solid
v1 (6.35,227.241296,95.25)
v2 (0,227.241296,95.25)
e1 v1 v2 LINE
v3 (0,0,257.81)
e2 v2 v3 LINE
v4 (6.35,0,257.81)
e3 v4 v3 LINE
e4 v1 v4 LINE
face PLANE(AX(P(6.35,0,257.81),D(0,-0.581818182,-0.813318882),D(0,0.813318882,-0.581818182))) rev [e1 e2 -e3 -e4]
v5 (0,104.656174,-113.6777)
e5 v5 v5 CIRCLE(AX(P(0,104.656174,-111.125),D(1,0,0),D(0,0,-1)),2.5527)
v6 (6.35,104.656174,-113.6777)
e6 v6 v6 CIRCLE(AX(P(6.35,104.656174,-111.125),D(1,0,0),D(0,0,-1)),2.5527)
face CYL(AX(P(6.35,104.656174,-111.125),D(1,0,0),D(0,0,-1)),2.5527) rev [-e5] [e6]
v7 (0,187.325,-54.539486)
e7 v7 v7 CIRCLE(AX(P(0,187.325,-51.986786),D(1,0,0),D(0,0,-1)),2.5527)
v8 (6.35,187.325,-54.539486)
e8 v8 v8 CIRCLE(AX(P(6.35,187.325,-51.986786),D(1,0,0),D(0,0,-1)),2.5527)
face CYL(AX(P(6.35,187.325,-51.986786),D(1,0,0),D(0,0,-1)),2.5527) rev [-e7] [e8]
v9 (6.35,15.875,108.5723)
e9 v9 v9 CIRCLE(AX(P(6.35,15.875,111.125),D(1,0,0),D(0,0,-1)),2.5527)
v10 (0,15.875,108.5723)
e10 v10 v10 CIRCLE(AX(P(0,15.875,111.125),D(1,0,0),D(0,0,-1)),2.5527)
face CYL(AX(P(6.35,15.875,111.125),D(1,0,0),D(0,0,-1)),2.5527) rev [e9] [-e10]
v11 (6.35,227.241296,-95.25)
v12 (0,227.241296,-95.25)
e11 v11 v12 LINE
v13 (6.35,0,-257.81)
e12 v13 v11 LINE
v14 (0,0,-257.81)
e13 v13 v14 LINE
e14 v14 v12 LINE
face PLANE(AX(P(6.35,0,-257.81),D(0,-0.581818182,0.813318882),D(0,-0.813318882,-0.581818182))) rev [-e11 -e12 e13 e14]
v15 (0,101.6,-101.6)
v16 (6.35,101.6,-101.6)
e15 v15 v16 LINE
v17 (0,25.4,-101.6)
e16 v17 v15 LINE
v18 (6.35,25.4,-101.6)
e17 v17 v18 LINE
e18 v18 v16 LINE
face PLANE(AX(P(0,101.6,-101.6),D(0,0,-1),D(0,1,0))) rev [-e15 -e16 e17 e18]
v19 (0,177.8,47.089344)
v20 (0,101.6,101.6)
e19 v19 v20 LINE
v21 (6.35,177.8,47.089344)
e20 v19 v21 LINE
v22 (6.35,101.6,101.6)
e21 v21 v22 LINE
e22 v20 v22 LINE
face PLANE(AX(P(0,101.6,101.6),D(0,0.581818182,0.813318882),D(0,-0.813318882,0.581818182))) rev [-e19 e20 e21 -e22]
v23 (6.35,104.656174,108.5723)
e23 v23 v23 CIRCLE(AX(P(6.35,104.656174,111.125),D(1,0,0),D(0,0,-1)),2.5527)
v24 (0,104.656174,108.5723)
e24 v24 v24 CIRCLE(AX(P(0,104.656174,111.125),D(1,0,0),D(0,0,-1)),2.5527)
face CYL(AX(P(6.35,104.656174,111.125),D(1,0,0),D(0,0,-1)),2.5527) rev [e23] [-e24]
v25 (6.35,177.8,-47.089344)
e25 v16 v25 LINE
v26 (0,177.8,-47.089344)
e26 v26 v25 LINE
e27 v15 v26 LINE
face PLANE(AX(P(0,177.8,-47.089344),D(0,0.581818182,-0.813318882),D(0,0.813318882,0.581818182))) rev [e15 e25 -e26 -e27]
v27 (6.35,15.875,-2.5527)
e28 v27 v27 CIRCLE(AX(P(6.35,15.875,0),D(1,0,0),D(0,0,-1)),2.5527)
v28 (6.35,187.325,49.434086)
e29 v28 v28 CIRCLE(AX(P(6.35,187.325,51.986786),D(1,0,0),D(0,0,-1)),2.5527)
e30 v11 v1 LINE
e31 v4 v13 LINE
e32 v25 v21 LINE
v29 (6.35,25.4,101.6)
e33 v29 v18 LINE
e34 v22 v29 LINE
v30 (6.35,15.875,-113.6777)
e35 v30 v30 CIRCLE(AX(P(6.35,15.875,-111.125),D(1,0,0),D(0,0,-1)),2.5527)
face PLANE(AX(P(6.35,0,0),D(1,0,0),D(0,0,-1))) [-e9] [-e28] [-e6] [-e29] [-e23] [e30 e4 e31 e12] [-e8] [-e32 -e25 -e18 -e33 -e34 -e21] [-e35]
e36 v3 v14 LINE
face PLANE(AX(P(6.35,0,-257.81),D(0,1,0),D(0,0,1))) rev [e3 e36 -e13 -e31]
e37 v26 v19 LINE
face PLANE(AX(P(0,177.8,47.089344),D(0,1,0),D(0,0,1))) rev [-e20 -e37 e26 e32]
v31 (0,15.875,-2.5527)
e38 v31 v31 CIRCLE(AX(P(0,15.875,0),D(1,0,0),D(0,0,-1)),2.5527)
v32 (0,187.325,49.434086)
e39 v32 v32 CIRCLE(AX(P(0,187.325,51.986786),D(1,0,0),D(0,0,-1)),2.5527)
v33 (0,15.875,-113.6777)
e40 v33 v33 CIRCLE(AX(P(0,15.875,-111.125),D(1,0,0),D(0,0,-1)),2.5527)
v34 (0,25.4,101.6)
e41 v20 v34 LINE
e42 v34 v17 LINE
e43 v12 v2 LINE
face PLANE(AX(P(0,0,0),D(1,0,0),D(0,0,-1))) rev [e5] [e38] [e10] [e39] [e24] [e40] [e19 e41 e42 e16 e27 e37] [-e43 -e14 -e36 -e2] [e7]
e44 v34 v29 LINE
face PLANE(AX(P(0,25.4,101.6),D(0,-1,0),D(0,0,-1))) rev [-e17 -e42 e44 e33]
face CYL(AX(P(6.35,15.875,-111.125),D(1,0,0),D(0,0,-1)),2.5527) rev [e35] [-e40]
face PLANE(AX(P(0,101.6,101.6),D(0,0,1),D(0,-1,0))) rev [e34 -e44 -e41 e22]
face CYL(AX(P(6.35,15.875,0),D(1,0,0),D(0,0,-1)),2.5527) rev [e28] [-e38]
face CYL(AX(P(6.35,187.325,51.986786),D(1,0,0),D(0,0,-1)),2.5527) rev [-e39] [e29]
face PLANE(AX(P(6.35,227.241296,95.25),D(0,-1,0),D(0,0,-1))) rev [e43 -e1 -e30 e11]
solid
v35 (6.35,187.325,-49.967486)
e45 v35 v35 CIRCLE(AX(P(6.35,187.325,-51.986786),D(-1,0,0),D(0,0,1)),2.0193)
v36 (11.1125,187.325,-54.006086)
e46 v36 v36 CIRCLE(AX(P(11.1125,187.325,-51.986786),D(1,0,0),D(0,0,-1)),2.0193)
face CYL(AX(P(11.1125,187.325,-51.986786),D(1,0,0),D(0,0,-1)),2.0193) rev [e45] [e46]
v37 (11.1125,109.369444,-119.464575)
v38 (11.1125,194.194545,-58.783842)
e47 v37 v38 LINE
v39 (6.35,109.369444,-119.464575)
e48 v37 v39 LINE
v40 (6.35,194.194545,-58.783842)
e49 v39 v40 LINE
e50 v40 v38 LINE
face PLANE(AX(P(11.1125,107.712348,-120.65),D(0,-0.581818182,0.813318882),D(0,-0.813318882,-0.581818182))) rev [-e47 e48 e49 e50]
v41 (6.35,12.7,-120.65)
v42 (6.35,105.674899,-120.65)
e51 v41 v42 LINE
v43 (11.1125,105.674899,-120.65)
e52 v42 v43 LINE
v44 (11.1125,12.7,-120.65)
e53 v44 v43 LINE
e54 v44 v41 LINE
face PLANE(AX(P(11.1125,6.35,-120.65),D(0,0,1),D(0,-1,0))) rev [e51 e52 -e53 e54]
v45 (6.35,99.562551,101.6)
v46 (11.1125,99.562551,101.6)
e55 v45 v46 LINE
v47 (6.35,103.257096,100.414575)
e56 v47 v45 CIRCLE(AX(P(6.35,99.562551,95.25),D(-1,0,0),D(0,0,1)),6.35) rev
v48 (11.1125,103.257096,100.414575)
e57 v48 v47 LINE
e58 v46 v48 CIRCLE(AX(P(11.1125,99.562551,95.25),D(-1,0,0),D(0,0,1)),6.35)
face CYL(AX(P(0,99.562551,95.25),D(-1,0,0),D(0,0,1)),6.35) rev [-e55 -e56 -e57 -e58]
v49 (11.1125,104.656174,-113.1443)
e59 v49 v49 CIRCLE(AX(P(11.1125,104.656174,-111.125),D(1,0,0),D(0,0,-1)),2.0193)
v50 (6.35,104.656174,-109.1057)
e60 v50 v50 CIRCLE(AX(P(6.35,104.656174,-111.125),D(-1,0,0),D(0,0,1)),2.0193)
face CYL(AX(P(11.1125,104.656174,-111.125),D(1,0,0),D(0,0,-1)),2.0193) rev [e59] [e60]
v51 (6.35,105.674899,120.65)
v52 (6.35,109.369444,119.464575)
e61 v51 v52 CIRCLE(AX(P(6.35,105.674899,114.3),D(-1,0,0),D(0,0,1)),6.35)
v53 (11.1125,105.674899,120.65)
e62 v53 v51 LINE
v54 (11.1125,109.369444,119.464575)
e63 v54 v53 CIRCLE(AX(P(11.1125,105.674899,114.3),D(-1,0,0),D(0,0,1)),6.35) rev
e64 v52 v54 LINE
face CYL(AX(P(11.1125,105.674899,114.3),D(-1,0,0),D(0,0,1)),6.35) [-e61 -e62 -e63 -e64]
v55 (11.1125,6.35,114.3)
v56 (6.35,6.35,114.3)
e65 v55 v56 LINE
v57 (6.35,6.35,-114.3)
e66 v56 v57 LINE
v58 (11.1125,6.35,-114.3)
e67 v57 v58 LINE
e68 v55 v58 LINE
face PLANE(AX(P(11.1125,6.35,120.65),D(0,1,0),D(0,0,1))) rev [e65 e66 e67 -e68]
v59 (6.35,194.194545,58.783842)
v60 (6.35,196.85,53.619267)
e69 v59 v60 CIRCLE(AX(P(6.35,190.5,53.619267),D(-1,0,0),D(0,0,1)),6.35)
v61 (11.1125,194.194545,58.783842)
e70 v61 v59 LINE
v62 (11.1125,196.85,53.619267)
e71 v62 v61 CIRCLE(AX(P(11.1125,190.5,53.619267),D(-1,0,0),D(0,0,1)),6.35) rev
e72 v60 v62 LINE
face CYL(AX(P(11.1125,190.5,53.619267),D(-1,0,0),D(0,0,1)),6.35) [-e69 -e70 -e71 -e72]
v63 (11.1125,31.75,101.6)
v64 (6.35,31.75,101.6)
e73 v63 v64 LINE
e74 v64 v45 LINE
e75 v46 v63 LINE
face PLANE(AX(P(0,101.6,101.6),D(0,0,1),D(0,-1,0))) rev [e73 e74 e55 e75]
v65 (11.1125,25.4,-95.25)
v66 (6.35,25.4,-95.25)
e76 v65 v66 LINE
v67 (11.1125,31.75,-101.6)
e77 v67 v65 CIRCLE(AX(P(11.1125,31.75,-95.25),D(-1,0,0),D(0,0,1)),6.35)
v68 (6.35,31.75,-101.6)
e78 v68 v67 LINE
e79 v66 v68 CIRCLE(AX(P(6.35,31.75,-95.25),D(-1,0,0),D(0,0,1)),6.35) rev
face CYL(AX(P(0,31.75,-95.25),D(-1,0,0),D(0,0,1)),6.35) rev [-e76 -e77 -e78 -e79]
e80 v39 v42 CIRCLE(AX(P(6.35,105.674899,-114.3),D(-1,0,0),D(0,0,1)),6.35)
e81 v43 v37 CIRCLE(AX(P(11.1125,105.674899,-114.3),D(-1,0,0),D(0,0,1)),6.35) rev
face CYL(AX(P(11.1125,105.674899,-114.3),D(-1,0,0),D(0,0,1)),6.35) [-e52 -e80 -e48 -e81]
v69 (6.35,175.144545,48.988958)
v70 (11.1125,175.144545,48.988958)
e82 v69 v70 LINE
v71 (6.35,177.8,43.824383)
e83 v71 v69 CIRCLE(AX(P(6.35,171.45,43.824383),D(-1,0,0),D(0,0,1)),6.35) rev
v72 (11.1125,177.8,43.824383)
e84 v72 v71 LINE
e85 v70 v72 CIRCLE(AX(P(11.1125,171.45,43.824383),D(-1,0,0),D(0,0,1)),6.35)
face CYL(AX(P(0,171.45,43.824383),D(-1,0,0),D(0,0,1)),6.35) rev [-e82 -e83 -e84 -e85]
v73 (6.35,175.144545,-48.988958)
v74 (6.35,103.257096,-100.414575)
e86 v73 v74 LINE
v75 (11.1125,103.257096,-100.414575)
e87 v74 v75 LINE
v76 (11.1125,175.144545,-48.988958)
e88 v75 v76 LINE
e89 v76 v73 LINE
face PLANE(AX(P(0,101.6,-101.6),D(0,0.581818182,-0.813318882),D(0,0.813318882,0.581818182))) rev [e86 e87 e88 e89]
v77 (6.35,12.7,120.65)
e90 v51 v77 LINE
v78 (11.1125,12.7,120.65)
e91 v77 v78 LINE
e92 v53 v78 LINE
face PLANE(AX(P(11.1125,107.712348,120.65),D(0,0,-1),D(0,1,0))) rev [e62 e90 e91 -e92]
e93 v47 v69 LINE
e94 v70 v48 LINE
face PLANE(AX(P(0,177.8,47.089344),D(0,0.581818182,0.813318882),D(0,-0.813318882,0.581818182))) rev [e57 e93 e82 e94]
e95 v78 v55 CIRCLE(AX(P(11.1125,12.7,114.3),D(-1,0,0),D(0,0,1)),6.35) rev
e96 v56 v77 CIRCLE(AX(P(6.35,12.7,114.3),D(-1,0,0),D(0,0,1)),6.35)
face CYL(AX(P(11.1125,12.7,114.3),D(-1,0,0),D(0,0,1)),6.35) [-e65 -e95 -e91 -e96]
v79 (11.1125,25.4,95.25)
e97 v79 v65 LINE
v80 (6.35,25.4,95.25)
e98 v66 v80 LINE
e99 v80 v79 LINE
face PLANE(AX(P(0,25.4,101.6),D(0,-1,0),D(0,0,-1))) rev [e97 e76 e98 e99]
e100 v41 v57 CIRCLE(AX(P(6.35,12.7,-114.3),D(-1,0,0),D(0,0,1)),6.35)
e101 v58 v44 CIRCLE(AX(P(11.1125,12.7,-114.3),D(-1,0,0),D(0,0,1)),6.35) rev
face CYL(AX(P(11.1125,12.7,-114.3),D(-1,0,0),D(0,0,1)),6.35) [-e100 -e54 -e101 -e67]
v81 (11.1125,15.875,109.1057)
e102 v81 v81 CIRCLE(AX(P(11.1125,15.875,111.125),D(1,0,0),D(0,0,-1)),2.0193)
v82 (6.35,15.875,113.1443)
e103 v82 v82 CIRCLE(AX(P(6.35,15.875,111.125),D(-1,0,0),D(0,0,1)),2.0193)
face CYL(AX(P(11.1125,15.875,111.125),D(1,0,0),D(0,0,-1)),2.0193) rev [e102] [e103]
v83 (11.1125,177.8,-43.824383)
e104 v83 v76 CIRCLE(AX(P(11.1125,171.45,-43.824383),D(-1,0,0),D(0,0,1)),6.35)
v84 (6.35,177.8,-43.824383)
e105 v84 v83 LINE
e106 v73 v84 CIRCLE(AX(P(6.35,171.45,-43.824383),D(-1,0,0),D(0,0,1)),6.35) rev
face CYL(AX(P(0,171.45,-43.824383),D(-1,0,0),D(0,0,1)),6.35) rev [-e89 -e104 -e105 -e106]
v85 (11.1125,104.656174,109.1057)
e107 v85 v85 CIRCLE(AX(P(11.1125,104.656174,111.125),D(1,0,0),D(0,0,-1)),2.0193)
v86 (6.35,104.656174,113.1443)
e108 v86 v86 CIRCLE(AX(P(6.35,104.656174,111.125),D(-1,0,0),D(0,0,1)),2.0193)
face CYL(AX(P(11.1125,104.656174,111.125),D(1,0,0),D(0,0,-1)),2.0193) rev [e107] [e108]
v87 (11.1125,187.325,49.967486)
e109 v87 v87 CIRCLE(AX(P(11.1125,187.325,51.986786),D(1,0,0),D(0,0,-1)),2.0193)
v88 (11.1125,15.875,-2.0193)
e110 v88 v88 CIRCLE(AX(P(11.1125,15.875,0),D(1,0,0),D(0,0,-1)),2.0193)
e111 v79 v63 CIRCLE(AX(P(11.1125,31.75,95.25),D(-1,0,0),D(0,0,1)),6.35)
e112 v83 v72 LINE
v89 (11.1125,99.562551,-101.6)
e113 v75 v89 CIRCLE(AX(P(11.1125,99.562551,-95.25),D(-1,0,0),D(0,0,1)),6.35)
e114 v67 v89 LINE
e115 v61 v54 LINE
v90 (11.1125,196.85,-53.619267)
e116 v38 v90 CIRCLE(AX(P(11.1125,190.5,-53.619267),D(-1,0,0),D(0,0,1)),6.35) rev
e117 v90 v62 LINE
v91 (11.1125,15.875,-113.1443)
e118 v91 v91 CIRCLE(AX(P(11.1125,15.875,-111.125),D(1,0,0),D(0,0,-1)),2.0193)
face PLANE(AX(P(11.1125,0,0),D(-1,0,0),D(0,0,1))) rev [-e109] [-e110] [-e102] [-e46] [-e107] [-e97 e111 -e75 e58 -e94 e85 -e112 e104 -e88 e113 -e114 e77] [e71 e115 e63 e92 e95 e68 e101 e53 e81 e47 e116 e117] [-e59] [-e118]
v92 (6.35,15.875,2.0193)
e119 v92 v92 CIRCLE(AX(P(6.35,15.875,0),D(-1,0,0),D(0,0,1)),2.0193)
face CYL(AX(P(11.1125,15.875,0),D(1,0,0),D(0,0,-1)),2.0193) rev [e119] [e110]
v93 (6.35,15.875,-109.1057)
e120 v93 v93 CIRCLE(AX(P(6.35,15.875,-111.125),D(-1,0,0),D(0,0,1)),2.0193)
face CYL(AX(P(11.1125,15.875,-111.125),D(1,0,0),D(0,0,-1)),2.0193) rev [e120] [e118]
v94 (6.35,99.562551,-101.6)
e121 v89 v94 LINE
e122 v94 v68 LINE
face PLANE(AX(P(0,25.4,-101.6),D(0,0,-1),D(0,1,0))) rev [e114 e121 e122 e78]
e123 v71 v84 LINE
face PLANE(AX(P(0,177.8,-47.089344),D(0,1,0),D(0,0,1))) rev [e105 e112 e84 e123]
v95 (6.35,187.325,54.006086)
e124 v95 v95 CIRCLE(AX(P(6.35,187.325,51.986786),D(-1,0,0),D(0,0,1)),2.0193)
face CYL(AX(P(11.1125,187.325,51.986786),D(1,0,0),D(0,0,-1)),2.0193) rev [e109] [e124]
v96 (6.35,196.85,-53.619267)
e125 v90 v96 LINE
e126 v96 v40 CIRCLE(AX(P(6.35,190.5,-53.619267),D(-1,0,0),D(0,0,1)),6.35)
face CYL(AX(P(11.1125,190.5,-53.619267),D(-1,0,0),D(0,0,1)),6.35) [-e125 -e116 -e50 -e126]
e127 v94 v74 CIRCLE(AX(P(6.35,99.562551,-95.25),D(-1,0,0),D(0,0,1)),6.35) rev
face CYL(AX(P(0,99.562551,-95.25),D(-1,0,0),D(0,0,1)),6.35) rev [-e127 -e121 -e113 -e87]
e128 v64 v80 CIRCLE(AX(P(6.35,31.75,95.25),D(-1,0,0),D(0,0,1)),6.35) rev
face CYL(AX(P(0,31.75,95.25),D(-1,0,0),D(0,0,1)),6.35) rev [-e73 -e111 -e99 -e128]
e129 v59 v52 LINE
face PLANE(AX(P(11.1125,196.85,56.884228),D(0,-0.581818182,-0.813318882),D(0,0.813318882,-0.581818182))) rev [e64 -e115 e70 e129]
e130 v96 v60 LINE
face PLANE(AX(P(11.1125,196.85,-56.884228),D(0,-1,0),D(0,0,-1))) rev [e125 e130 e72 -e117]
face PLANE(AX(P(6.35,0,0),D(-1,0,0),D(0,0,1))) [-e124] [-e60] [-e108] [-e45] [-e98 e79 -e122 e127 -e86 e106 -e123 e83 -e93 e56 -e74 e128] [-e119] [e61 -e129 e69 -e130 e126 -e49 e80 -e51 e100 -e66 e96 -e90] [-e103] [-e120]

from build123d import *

# Parameters (mm, degrees)
ANGLEDBALLAST_DECKFRONT_OUTLINE_R = 2.5527
ANGLEDBALLAST_DECKFRONT_DEPTH     = 6.35
BOSS_EXTRUDE1_DEPTH               = 4.7625
CUT_EXTRUDE2_DEPTH                = 344.843118524
SKETCH6_W                         = 2.0193
SKETCH6_H                         = 11.1125
F_10_32_TAPPED_HOLE1_AT_2_COUNT   = 2
F_10_32_TAPPED_HOLE1_AT_2_PITCH   = 88.781174089
F_10_32_TAPPED_HOLE1_AT_3_COUNT   = 2
F_10_32_TAPPED_HOLE1_AT_3_PITCH   = 181.362705212
F_10_32_TAPPED_HOLE1_AT_4_COUNT   = 2
F_10_32_TAPPED_HOLE1_AT_4_PITCH   = 236.644368766
F_10_32_TAPPED_HOLE1_AT_5_COUNT   = 2
F_10_32_TAPPED_HOLE1_AT_5_PITCH   = 239.326470272
F_10_32_TAPPED_HOLE1_AT_6_COUNT   = 2
F_10_32_TAPPED_HOLE1_AT_6_PITCH   = 222.25
F_10_32_TAPPED_HOLE1_AT_7_COUNT   = 2
F_10_32_TAPPED_HOLE1_AT_7_PITCH   = 111.125
FILLET1_R                         = 6.35


# Read off the part's stored shape, not the designer's step: AngledBallast_DeckFront
with BuildPart() as part:
    # AngledBallast_DeckFront outline → AngledBallast_DeckFront (new body)
    with BuildSketch(Plane.YZ):
        Polygon((227.241295543, 95.25), (0, 257.81), (0, -257.81), (227.241295543, -95.25), align=None)
        with Locations((15.875, -111.125)):
            Circle(ANGLEDBALLAST_DECKFRONT_OUTLINE_R, mode=Mode.SUBTRACT)
        with Locations((104.656174089, -111.125)):
            Circle(ANGLEDBALLAST_DECKFRONT_OUTLINE_R, mode=Mode.SUBTRACT)
        with Locations((187.325, -51.986786112)):
            Circle(ANGLEDBALLAST_DECKFRONT_OUTLINE_R, mode=Mode.SUBTRACT)
        with Locations((15.875, 0)):
            Circle(ANGLEDBALLAST_DECKFRONT_OUTLINE_R, mode=Mode.SUBTRACT)
        with Locations((15.875, 111.125)):
            Circle(ANGLEDBALLAST_DECKFRONT_OUTLINE_R, mode=Mode.SUBTRACT)
        Polygon((101.6, -101.6), (25.4, -101.6), (25.4, 101.6), (101.6, 101.6), (177.8, 47.089344398), (177.8, -47.089344398), align=None, mode=Mode.SUBTRACT)
        with Locations((104.656174089, 111.125)):
            Circle(ANGLEDBALLAST_DECKFRONT_OUTLINE_R, mode=Mode.SUBTRACT)
        with Locations((187.325, 51.986786112)):
            Circle(ANGLEDBALLAST_DECKFRONT_OUTLINE_R, mode=Mode.SUBTRACT)
    extrude(amount=ANGLEDBALLAST_DECKFRONT_DEPTH)


with BuildPart() as body_2:
    # Sketch1 → Boss-Extrude1 (new body)
    with BuildSketch(Plane(origin=(6.35, 0, 0), x_dir=(0, 0, -1), z_dir=(1, 0, 0))):
        Polygon((120.65, 107.712348179), (56.884227826, 196.85), (-56.884227826, 196.85), (-120.65, 107.712348179), (-120.65, 6.35), (120.65, 6.35), align=None)
    extrude(amount=BOSS_EXTRUDE1_DEPTH)

    # Sketch4 → Cut-Extrude2 (cut, through all)
    with BuildSketch(Plane(origin=(11.1125, 0, 0), x_dir=(0, 0, -1), z_dir=(1, 0, 0))):
        Polygon((-47.089344398, 177.8), (-101.6, 101.6), (-101.6, 25.4), (101.6, 25.4), (101.6, 101.6), (47.089344398, 177.8), align=None)
    extrude(amount=-CUT_EXTRUDE2_DEPTH, mode=Mode.SUBTRACT)

    # Sketch6 → #10-32 Tapped Hole1 (revolve, cut)
    with BuildSketch(Plane(origin=(11.1125, 15.875, 111.125), x_dir=(0, 0, -1), z_dir=(0, 1, 0))):
        with Locations((1.00965, 5.55625)):
            Rectangle(SKETCH6_W, SKETCH6_H)
    f_10_32_tapped_hole1 = revolve(axis=Axis((17.4625, 15.875, 111.125), (-1, 0, 0)), mode=Mode.SUBTRACT)

    # #10-32 Tapped Hole1 at 2: #10-32 Tapped Hole1 ×2
    with Locations(*[(0, i * F_10_32_TAPPED_HOLE1_AT_2_PITCH, 0) for i in range(1, F_10_32_TAPPED_HOLE1_AT_2_COUNT)]):
        add(f_10_32_tapped_hole1, mode=Mode.SUBTRACT)

    # #10-32 Tapped Hole1 at 3: #10-32 Tapped Hole1 ×2
    with Locations(*[Vector(0, 0.9453431994157798, -0.3260770389315034) * (i * F_10_32_TAPPED_HOLE1_AT_3_PITCH) for i in range(1, F_10_32_TAPPED_HOLE1_AT_3_COUNT)]):
        add(f_10_32_tapped_hole1, mode=Mode.SUBTRACT)

    # #10-32 Tapped Hole1 at 4: #10-32 Tapped Hole1 ×2
    with Locations(*[Vector(0, 0.7245048800195719, -0.6892696706136328) * (i * F_10_32_TAPPED_HOLE1_AT_4_PITCH) for i in range(1, F_10_32_TAPPED_HOLE1_AT_4_COUNT)]):
        add(f_10_32_tapped_hole1, mode=Mode.SUBTRACT)

    # #10-32 Tapped Hole1 at 5: #10-32 Tapped Hole1 ×2
    with Locations(*[Vector(0, 0.37096261850402434, -0.928647799584233) * (i * F_10_32_TAPPED_HOLE1_AT_5_PITCH) for i in range(1, F_10_32_TAPPED_HOLE1_AT_5_COUNT)]):
        add(f_10_32_tapped_hole1, mode=Mode.SUBTRACT)

    # #10-32 Tapped Hole1 at 6: #10-32 Tapped Hole1 ×2
    with Locations(*[(0, 0, -i * F_10_32_TAPPED_HOLE1_AT_6_PITCH) for i in range(1, F_10_32_TAPPED_HOLE1_AT_6_COUNT)]):
        add(f_10_32_tapped_hole1, mode=Mode.SUBTRACT)

    # #10-32 Tapped Hole1 at 7: #10-32 Tapped Hole1 ×2
    with Locations(*[(0, 0, -i * F_10_32_TAPPED_HOLE1_AT_7_PITCH) for i in range(1, F_10_32_TAPPED_HOLE1_AT_7_COUNT)]):
        add(f_10_32_tapped_hole1, mode=Mode.SUBTRACT)

    # Fillet1
    fillet1_edges = [body_2.edges().sort_by_distance(p)[0] for p in [
        (8.73125, 196.85, 56.884227826),
        (8.73125, 196.85, -56.884227826),
        (8.73125, 107.712348179, -120.65),
        (8.73125, 6.35, -120.65),
        (8.73125, 6.35, 120.65),
        (8.73125, 107.712348179, 120.65),
        (8.73125, 177.8, 47.089344398),
        (8.73125, 177.8, -47.089344398),
        (8.73125, 101.6, -101.6),
        (8.73125, 25.4, -101.6),
        (8.73125, 25.4, 101.6),
        (8.73125, 101.6, 101.6),
    ]]
    fillet(fillet1_edges, radius=FILLET1_R)


solid = Compound([part.part, body_2.part])
